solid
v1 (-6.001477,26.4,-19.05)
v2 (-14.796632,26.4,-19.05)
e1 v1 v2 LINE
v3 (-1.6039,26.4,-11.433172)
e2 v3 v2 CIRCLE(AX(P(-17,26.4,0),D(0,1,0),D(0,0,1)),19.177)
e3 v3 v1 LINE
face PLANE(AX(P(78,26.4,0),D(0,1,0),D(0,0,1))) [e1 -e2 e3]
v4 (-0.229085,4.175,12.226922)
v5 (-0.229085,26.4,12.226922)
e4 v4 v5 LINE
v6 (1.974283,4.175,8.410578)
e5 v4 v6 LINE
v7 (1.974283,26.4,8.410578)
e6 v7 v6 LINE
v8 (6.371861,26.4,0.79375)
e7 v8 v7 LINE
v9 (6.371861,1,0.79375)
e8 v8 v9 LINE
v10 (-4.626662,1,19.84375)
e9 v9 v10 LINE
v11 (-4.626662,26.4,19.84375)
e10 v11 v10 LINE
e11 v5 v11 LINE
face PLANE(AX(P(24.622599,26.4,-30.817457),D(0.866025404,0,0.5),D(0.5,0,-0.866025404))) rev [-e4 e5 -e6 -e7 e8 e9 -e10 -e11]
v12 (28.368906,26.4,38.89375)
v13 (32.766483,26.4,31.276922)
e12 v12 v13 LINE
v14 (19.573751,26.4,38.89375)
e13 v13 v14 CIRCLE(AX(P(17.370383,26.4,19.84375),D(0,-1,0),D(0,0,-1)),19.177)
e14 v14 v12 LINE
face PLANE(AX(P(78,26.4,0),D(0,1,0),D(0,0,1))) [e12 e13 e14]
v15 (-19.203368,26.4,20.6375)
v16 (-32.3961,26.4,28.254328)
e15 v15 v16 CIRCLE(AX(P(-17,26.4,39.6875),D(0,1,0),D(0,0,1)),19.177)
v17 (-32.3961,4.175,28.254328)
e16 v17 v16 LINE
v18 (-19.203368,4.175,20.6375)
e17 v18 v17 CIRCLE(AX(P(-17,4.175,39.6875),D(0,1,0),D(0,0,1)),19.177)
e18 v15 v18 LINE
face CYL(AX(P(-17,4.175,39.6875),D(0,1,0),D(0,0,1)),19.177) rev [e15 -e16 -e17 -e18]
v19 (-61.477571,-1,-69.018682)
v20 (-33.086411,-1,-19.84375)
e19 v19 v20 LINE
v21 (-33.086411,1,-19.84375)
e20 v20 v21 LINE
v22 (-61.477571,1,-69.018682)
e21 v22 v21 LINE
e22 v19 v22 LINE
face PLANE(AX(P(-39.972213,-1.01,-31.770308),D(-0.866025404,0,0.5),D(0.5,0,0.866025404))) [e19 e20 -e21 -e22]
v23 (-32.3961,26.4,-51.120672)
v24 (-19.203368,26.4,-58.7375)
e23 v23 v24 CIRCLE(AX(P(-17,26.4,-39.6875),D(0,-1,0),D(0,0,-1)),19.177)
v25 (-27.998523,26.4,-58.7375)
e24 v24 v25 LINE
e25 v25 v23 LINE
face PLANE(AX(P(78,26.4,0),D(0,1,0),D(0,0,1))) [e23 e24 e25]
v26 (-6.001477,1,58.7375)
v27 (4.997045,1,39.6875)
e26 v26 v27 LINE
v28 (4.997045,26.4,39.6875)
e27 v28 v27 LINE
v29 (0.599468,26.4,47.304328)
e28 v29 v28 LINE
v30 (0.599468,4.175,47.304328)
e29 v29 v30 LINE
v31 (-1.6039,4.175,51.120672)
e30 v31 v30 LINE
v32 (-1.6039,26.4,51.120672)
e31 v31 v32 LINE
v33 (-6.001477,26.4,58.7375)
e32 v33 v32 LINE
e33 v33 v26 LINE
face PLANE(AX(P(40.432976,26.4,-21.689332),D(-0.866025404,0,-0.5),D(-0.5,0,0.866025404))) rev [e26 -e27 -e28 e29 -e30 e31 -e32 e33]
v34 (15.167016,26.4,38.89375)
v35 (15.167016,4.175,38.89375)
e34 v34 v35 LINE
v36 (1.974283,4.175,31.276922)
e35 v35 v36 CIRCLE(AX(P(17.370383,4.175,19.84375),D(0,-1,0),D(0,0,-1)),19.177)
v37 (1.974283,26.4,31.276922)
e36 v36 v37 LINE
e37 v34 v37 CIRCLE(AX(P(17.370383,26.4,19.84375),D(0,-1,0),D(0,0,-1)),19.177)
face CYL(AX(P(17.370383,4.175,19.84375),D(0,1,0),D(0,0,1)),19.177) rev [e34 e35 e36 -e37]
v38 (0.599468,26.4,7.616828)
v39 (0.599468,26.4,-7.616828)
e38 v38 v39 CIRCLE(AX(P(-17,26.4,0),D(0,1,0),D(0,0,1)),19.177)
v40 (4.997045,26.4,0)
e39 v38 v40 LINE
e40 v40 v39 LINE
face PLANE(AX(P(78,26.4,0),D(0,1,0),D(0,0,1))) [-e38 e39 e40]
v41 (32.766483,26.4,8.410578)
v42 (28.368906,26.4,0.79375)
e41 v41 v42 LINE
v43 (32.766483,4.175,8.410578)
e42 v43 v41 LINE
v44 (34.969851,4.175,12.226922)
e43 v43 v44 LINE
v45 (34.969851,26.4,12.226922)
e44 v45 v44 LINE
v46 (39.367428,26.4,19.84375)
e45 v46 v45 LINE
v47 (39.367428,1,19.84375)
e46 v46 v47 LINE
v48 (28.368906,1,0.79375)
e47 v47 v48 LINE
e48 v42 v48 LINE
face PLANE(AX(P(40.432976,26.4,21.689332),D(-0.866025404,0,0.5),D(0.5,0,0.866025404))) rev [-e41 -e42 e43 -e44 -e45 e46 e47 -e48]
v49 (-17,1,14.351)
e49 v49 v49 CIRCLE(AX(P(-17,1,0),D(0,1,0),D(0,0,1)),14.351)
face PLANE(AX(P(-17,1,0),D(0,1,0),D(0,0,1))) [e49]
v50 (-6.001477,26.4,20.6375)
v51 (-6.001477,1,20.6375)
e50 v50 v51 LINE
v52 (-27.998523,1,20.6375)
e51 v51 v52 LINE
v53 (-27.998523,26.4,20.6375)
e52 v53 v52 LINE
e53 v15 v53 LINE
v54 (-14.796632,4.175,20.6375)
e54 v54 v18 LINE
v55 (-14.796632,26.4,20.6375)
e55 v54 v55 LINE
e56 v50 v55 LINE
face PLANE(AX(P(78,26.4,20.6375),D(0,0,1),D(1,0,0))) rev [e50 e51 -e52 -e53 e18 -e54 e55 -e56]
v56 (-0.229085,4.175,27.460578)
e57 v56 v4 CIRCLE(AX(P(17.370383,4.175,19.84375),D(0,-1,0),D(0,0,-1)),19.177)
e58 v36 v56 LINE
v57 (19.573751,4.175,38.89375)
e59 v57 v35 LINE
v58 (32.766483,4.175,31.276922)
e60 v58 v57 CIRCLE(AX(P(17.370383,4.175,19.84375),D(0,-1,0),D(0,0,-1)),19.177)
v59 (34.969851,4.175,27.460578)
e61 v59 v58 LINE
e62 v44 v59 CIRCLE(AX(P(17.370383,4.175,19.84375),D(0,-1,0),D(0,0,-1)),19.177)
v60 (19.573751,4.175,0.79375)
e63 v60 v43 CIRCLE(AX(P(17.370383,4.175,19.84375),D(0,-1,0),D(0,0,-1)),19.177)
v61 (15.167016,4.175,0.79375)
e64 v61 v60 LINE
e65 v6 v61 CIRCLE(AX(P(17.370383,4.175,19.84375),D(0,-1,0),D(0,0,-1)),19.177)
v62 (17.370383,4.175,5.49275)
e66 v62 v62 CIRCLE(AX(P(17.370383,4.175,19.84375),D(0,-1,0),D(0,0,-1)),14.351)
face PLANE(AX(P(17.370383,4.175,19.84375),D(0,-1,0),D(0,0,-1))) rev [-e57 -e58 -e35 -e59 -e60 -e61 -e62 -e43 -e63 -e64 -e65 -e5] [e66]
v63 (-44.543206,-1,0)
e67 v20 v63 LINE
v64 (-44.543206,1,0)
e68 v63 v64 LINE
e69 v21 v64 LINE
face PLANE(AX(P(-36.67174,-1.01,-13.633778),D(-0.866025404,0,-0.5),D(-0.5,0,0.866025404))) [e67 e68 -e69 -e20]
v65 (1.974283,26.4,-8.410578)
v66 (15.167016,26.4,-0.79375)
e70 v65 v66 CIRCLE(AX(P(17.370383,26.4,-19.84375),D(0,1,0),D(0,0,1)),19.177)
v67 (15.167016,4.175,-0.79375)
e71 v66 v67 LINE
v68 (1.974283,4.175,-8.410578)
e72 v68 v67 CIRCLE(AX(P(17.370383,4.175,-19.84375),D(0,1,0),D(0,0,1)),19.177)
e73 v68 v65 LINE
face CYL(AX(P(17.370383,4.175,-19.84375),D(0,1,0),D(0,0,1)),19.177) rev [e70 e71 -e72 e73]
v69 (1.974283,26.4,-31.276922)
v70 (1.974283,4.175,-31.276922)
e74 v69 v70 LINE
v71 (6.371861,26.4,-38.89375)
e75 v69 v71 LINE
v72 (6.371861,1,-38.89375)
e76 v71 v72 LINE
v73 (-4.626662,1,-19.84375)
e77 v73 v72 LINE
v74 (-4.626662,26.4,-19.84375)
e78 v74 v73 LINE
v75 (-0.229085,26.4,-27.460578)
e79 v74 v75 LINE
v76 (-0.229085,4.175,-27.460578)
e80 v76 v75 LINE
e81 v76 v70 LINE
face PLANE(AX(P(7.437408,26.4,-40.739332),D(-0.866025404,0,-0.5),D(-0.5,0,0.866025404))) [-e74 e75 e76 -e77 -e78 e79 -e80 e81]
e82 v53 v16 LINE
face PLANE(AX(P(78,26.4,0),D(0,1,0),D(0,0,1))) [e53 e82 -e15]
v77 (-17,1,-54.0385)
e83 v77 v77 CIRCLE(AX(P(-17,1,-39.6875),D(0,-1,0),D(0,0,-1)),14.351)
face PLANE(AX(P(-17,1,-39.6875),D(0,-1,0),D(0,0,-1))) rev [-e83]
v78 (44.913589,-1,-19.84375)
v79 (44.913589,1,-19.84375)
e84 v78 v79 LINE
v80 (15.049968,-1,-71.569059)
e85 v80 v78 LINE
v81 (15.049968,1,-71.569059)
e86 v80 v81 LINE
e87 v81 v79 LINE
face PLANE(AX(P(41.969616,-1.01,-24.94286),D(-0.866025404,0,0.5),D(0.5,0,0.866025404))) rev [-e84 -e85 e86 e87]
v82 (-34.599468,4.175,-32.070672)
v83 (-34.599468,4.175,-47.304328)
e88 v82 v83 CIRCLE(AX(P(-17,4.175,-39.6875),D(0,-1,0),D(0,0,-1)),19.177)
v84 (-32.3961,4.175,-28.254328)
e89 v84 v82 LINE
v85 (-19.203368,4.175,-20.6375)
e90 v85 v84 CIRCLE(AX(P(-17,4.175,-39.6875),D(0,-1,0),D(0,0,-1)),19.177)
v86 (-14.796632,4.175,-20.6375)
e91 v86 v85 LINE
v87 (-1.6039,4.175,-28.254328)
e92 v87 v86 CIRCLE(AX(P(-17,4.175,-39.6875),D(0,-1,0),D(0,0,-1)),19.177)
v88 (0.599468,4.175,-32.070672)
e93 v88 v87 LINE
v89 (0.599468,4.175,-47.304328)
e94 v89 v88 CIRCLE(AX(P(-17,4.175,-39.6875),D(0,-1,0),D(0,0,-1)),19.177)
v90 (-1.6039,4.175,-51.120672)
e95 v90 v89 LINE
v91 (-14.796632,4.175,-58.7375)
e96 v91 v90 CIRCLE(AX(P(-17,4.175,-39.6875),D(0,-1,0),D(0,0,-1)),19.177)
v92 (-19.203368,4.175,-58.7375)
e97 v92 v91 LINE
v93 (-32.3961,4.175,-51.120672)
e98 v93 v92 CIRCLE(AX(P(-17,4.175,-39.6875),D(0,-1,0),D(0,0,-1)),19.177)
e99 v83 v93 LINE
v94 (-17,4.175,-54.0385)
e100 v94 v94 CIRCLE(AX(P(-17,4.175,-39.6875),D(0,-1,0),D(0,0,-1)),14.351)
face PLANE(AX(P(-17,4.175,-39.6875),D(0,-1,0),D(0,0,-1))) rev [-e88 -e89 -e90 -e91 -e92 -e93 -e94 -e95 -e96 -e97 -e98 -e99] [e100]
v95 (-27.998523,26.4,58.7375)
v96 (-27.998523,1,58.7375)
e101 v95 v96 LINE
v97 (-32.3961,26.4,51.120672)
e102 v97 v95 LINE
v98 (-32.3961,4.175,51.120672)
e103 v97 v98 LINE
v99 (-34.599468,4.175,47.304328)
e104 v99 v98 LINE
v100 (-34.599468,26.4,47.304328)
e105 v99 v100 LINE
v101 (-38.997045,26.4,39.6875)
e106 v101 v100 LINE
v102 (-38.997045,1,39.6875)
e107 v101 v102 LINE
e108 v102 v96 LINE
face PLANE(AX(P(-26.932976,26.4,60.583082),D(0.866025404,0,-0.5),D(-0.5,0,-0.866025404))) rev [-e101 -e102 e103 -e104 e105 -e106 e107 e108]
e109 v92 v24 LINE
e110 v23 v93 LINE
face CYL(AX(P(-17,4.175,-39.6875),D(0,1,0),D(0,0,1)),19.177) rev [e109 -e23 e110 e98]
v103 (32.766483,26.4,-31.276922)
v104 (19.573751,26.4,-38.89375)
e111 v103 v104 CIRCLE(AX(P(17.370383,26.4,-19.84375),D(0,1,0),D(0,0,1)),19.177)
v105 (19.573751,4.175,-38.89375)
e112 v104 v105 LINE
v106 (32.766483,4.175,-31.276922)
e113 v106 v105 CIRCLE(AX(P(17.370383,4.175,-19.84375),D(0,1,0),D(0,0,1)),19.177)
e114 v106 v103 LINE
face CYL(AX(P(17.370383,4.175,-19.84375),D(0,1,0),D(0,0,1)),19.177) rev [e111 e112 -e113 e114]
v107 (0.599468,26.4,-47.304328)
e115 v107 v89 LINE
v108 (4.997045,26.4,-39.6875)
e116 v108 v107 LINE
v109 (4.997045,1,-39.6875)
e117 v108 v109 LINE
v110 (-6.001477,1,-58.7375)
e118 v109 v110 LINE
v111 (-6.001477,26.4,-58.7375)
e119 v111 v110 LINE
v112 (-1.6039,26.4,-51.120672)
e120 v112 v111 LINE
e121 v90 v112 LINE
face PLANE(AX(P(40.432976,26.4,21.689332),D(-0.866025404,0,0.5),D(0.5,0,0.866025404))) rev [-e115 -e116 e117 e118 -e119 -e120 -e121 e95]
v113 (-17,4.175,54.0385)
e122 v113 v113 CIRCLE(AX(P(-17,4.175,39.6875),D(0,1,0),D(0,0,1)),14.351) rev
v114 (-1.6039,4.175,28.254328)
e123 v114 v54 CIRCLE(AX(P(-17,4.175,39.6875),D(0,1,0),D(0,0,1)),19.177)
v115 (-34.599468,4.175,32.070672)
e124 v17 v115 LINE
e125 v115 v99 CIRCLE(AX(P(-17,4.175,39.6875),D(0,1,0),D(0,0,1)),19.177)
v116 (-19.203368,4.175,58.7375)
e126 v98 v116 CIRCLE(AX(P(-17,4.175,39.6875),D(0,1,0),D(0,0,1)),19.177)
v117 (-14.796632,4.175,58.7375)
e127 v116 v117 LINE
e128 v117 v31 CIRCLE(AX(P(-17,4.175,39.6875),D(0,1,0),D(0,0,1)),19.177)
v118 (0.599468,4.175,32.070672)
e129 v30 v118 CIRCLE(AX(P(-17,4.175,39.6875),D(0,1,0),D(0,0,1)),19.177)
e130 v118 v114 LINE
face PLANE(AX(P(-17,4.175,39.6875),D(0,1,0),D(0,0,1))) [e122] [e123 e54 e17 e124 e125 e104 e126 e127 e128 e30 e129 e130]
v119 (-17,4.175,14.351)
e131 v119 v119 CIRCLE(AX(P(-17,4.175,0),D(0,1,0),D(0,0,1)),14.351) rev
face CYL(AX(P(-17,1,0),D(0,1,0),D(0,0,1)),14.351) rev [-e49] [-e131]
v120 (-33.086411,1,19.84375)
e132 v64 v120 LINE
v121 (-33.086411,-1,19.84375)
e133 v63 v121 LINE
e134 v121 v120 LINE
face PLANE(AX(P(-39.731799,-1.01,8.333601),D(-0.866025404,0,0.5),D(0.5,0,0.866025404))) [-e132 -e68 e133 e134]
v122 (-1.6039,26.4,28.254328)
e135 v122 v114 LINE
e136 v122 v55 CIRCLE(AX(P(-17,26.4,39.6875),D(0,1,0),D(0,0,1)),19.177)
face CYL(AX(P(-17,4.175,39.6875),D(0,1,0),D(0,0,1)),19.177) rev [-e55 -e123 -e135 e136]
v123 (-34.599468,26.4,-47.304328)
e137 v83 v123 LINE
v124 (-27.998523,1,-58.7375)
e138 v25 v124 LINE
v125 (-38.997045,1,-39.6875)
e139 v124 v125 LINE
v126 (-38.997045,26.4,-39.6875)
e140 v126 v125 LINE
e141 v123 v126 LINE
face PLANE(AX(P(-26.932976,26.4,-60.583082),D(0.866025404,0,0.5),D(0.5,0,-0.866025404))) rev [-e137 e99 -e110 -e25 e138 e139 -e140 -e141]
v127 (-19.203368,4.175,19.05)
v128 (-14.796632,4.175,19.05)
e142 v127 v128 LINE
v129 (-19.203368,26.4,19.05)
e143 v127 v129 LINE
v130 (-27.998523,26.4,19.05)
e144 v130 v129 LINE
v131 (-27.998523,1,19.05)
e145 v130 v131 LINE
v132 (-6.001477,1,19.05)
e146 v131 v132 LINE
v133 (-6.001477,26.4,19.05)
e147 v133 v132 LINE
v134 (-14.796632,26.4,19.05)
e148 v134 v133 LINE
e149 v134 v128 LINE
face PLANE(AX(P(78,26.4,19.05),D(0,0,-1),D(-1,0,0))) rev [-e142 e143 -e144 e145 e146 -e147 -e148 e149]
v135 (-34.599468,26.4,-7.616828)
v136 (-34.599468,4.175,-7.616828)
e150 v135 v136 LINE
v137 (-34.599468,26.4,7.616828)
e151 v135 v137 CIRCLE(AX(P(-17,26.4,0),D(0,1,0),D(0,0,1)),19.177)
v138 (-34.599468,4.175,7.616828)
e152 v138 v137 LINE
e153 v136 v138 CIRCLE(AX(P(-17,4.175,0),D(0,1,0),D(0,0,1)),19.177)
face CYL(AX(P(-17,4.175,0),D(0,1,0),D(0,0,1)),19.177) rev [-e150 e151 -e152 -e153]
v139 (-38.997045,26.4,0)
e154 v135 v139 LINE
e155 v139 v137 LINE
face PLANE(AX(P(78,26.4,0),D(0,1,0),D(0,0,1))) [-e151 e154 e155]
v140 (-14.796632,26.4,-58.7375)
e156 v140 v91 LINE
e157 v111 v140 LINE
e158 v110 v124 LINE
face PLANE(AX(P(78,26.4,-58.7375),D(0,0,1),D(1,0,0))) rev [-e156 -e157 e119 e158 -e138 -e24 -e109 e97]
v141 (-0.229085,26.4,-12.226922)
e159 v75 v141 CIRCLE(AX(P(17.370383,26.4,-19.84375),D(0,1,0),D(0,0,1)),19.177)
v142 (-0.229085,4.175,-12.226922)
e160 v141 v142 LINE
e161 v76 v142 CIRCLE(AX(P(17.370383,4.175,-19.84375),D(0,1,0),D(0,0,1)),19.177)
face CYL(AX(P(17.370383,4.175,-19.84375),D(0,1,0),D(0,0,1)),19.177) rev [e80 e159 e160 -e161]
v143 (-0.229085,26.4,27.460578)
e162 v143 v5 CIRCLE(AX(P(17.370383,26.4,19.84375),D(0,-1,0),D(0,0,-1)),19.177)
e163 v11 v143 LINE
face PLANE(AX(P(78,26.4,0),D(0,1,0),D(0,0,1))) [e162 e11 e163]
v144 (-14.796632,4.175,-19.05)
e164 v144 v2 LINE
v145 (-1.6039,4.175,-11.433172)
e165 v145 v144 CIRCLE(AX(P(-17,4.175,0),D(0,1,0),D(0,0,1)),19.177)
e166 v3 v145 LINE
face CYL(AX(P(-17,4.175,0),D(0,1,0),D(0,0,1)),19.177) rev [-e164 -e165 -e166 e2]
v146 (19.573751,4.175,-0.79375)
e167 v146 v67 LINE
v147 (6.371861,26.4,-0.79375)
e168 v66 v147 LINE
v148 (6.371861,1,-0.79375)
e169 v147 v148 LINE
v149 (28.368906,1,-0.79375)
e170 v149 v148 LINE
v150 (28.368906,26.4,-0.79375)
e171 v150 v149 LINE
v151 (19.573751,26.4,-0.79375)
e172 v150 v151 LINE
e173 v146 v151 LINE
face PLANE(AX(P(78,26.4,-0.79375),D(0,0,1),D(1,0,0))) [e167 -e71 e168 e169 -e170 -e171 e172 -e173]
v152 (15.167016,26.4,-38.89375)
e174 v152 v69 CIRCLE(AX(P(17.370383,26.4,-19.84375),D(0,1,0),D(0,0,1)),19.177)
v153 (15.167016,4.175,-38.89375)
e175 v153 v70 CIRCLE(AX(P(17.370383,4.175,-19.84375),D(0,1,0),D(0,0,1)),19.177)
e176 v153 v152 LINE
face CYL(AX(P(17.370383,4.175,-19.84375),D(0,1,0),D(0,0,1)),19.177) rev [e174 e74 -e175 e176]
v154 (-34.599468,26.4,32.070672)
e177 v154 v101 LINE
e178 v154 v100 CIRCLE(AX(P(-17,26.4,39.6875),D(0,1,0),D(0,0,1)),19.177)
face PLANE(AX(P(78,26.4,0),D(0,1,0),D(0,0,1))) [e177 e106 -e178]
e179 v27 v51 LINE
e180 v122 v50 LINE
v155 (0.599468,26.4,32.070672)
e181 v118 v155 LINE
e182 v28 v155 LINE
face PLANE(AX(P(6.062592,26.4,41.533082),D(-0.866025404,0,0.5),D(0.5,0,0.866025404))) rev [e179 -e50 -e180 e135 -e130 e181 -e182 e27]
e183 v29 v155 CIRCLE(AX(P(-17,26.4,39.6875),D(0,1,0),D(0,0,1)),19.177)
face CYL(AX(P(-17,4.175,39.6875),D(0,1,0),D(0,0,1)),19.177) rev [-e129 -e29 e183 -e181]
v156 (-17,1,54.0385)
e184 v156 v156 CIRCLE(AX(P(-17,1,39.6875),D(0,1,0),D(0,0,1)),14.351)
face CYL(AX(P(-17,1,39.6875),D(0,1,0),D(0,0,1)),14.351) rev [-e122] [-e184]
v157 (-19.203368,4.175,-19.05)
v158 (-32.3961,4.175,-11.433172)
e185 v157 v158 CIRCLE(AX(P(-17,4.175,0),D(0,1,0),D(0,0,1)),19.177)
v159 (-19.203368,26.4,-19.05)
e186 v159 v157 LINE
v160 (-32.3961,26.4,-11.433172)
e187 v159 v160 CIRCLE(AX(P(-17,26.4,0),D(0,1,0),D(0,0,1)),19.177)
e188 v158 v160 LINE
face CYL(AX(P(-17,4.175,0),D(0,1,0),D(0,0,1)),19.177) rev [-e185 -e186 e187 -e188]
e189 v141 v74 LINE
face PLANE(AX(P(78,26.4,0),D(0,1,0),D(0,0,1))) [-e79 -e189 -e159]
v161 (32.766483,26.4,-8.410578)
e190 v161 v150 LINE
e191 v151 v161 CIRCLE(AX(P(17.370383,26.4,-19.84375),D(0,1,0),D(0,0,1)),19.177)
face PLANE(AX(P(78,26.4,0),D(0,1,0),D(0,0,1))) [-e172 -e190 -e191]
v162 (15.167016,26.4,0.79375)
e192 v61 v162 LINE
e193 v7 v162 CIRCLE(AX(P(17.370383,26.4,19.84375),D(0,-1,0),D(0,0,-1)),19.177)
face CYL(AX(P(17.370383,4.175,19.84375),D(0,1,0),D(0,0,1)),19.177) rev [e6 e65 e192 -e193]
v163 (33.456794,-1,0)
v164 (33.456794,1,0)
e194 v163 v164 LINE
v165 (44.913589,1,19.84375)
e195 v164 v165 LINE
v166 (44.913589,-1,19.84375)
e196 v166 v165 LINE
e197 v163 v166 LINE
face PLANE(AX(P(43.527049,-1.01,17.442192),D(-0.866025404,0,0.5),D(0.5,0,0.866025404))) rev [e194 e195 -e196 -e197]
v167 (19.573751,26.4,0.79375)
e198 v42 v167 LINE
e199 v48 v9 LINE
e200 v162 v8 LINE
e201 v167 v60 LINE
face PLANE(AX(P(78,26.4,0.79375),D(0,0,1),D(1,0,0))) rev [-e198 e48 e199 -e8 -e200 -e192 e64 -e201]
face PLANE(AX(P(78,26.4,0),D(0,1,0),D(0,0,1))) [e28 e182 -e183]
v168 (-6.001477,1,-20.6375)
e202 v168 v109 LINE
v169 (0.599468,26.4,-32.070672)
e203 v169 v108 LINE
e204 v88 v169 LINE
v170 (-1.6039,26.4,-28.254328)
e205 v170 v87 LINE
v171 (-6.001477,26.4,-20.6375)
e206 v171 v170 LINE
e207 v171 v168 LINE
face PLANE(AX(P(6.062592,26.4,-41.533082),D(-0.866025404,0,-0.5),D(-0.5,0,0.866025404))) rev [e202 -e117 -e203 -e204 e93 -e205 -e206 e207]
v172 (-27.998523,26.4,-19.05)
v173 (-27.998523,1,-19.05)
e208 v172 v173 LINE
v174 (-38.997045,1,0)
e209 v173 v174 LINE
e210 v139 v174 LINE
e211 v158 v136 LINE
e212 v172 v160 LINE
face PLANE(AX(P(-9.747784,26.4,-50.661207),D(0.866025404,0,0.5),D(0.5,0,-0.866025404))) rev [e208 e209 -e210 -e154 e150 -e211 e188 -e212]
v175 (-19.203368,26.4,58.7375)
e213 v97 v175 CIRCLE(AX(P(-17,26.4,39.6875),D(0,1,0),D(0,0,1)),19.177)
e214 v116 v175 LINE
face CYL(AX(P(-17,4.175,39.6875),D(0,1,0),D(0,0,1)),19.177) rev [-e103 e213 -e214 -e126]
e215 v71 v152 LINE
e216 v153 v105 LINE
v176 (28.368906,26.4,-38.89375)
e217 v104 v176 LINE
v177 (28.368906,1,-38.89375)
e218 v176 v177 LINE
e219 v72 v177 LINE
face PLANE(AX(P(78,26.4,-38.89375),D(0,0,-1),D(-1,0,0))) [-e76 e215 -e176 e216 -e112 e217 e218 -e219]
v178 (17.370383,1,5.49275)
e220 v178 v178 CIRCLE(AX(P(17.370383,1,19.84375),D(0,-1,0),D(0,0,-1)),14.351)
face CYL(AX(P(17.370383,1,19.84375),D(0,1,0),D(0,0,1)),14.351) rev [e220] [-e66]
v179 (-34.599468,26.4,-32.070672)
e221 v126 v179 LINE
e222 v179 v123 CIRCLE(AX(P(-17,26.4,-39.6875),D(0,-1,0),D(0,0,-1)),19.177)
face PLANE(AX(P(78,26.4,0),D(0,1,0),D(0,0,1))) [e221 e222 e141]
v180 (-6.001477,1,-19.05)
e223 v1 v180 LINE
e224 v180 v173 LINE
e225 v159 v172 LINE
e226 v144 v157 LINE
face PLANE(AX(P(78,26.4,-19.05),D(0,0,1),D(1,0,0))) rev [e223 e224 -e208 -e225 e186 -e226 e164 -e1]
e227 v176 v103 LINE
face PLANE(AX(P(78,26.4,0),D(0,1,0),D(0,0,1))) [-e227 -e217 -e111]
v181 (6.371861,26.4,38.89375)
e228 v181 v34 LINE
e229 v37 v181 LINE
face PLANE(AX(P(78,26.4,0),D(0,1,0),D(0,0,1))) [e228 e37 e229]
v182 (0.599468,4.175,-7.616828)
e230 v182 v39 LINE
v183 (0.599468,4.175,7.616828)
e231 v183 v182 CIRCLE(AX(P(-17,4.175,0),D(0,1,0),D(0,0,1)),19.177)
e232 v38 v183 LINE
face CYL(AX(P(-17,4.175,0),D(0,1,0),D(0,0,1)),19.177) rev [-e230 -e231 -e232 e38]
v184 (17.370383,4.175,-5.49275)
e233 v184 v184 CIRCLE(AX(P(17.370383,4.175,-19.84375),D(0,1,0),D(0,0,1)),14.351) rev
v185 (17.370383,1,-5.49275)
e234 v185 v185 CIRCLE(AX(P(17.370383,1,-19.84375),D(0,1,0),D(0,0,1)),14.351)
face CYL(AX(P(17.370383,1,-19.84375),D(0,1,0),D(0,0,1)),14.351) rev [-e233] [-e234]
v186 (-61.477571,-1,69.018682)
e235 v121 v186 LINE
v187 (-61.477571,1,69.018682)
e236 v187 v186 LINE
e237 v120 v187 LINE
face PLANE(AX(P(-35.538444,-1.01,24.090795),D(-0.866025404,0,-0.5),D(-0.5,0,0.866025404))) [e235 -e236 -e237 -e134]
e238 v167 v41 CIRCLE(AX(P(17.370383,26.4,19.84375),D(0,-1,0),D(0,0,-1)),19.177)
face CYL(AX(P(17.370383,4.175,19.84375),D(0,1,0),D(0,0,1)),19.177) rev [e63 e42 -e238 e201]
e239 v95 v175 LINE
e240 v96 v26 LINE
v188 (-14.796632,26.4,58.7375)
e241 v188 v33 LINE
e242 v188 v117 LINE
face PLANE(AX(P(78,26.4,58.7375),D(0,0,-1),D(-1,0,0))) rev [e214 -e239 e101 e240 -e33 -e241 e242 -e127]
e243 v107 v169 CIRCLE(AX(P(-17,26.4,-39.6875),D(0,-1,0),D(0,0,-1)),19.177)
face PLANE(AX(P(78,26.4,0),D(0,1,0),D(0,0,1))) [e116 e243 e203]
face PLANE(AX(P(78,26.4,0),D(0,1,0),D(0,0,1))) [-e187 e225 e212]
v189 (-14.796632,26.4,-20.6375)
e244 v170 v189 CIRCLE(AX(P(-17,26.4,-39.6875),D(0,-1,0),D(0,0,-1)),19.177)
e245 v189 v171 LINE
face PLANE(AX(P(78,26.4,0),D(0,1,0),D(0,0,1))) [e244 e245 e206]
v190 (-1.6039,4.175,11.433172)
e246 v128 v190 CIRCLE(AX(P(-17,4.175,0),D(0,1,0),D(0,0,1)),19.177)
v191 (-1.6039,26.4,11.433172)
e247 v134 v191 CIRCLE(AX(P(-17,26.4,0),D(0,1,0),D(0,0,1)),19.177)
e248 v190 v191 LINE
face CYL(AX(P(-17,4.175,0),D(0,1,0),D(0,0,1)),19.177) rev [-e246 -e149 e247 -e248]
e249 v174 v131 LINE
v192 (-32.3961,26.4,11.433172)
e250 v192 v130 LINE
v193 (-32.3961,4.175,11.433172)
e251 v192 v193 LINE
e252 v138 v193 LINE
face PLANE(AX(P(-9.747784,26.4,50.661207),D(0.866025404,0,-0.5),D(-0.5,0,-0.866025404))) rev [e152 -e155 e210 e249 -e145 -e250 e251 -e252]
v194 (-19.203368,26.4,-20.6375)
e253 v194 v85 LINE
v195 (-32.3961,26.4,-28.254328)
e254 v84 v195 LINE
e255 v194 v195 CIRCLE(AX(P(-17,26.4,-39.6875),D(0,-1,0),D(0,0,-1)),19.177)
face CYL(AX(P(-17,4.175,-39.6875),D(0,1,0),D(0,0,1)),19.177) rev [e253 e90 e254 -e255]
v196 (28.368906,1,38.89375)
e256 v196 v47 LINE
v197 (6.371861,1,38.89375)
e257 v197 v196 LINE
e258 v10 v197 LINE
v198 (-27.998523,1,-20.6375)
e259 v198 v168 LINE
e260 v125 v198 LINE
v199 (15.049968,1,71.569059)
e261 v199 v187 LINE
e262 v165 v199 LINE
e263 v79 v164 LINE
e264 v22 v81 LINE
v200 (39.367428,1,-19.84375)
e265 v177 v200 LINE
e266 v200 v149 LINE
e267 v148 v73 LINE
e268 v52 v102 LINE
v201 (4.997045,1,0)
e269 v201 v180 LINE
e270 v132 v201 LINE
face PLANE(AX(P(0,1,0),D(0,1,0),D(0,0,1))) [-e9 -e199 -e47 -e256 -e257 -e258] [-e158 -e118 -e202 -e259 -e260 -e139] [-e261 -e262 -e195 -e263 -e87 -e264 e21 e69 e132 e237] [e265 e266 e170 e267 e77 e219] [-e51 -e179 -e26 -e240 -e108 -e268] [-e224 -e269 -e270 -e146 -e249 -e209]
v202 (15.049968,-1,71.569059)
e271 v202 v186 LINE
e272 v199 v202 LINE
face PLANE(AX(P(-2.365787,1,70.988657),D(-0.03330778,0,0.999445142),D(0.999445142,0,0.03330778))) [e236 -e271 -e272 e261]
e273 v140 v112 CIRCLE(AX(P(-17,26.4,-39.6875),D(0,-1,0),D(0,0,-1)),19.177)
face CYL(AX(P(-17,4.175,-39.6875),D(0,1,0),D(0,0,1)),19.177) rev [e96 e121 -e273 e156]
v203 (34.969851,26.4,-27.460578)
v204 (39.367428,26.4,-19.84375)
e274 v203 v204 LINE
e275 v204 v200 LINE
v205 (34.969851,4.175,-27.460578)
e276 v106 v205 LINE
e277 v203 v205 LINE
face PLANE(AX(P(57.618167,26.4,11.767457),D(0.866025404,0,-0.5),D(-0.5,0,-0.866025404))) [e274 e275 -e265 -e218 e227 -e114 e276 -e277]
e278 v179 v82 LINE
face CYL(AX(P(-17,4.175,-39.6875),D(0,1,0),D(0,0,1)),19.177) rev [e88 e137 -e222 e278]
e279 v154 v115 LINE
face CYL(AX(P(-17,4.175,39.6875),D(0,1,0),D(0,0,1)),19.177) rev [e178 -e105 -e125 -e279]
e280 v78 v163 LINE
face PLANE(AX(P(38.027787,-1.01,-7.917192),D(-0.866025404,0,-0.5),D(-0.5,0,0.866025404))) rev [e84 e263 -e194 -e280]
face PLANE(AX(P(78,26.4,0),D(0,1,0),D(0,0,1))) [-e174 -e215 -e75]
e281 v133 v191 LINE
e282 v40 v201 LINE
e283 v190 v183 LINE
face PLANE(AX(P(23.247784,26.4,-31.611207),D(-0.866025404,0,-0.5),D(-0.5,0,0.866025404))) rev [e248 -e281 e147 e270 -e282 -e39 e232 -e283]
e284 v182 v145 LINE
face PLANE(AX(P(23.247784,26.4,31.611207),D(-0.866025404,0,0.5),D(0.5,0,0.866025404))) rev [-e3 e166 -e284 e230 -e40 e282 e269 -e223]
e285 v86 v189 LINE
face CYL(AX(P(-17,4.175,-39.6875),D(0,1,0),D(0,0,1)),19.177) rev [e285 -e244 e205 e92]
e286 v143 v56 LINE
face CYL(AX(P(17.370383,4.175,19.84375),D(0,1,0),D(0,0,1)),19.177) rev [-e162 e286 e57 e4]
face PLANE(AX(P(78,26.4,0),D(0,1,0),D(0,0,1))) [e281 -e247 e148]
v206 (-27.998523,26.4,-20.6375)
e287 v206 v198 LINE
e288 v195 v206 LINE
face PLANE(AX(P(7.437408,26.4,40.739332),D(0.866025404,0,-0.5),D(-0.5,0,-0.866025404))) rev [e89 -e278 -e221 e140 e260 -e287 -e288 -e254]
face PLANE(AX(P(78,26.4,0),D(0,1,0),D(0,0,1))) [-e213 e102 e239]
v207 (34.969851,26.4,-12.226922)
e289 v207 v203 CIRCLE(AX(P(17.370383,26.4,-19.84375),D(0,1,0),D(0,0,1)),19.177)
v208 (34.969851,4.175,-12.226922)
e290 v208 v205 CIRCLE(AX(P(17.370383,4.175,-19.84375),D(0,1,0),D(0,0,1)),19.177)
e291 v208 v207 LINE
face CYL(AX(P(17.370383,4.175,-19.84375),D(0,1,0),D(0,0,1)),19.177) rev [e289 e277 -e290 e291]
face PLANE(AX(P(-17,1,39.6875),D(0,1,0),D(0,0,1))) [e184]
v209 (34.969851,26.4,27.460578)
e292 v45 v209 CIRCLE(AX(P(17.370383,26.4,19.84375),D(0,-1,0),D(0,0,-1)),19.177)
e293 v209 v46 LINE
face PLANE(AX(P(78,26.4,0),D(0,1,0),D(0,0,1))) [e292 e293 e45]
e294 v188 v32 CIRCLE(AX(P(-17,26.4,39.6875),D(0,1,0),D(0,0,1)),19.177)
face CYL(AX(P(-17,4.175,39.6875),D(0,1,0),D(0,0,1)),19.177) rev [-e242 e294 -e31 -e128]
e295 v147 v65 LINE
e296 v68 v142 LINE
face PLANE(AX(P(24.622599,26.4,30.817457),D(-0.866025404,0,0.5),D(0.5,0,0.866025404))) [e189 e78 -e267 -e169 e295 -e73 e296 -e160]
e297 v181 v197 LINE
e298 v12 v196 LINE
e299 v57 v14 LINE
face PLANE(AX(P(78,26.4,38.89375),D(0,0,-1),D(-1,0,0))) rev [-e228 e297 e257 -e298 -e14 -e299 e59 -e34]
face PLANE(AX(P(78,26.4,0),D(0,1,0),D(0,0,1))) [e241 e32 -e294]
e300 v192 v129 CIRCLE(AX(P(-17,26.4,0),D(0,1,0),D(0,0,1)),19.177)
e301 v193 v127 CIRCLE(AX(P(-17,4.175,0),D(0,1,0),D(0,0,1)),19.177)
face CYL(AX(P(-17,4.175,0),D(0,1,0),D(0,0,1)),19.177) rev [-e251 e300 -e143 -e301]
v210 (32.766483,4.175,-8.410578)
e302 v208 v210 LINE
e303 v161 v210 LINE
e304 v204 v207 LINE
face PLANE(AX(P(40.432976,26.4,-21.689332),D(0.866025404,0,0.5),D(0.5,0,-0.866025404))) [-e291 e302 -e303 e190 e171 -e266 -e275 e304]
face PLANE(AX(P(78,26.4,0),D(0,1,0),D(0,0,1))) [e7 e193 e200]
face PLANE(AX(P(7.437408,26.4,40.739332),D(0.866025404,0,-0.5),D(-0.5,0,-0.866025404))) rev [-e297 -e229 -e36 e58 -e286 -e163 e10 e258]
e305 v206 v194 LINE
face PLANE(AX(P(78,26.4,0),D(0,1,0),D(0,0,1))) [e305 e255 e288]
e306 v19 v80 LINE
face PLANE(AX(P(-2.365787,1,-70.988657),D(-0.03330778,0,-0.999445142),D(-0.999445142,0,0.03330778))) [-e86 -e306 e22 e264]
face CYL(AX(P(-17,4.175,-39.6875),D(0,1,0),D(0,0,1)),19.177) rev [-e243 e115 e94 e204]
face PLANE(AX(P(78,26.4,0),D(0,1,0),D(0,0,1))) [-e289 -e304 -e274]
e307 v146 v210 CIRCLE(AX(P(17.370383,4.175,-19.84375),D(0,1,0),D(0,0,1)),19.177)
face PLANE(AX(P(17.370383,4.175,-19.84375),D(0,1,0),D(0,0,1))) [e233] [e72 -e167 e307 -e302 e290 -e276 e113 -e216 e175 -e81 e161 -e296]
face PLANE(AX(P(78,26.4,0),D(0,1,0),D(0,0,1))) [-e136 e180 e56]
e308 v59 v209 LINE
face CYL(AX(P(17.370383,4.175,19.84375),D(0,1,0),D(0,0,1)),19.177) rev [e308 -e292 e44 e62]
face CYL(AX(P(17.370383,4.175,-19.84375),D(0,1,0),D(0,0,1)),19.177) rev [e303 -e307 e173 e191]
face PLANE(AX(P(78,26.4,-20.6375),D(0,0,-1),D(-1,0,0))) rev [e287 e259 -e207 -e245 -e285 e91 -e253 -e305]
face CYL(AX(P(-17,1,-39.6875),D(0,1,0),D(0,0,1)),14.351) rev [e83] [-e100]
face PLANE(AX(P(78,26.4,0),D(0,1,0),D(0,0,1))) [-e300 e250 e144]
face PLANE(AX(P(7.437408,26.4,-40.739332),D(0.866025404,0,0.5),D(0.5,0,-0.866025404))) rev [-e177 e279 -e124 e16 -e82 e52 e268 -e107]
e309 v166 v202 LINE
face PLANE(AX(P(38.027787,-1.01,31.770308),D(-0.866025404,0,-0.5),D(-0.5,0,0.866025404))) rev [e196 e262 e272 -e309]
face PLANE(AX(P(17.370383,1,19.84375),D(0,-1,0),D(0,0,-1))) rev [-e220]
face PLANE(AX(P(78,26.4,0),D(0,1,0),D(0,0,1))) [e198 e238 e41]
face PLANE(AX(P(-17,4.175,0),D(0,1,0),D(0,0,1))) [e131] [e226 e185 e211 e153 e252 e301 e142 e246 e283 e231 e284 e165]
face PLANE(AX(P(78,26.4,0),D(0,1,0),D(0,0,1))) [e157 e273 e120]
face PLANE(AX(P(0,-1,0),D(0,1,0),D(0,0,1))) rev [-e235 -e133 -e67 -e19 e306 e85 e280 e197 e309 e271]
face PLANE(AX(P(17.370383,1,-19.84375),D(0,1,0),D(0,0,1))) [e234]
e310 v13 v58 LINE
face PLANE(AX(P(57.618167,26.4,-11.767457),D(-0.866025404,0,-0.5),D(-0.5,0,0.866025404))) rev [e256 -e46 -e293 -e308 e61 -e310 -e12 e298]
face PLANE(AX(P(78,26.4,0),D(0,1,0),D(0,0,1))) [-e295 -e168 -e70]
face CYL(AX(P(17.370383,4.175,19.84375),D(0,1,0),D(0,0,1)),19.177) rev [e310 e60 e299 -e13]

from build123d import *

# Parameters (mm, degrees)
BOSS_EXTRUDE1_DEPTH = 1
BOSS_EXTRUDE2_DEPTH = 25.4
SKETCH4_R           = 14.351
CUT_EXTRUDE1_DEPTH  = 25.4
SKETCH4_4_R         = 19.177
CUT_EXTRUDE2_DEPTH  = 22.225
LPATTERN1_COUNT     = 3
LPATTERN1_PITCH     = 78
SPLIT3_START        = -1
SPLIT3_DEPTH        = 27.4


# Read off the part's stored shape, not the designer's step: Split3
with BuildPart() as part:
    # Sketch1 → Boss-Extrude1 (new, symmetric)
    with BuildSketch(Plane(origin=(0, 0, 0), x_dir=(1, 0, 0), z_dir=(0, 1, 0))):
        Polygon((118, 0), (-118, 0), (-118, -67.135), (118, -75), align=None)
        Polygon((-118, 67.135), (-118, 0), (118, 0), (118, 75), align=None)
    extrude(amount=BOSS_EXTRUDE1_DEPTH, both=True)

    # Sketch3 → Boss-Extrude2 (add)
    with BuildSketch(Plane(origin=(0, 1, 0), x_dir=(1, 0, 0), z_dir=(0, 1, 0))):
        Polygon((-84.001477372, 20.6375), (-73.002954744, 39.6875), (-84.001477372, 58.7375), (-105.998522628, 58.7375), (-116.997045256, 39.6875), (-105.998522628, 20.6375), align=None)
        Polygon((-38.632571531, 19.84375), (-49.631094159, 0.79375), (-71.628139415, 0.79375), (-82.626662043, 19.84375), (-71.628139415, 38.89375), (-49.631094159, 38.89375), align=None)
        Polygon((-84.001477372, -19.05), (-73.002954744, 0), (-84.001477372, 19.05), (-105.998522628, 19.05), (-116.997045256, 0), (-105.998522628, -19.05), align=None)
        Polygon((-105.998522628, -58.7375), (-84.001477372, -58.7375), (-73.002954744, -39.6875), (-84.001477372, -20.6375), (-105.998522628, -20.6375), (-116.997045256, -39.6875), align=None)
        Polygon((-71.628139415, -38.89375), (-49.631094159, -38.89375), (-38.632571531, -19.84375), (-49.631094159, -0.79375), (-71.628139415, -0.79375), (-82.626662043, -19.84375), align=None)
    boss_extrude2 = extrude(amount=BOSS_EXTRUDE2_DEPTH)

    # Sketch4 → Cut-Extrude1 (cut)
    with BuildSketch(Plane(origin=(0, 26.4, 0), x_dir=(1, 0, 0), z_dir=(0, 1, 0))):
        with Locations(Location((-95, 0, 0), (0, 0, 270))):
            Circle(SKETCH4_R)
        with Locations(Location((-95, -39.6875, 0), (0, 0, 270))):
            Circle(SKETCH4_R)
        with Locations(Location((-95, 39.6875, 0), (0, 0, 90))):
            Circle(SKETCH4_R)
        with Locations(Location((-60.629616787, 19.84375, 0), (0, 0, 270))):
            Circle(SKETCH4_R)
        with Locations(Location((-60.629616787, -19.84375, 0), (0, 0, 90))):
            Circle(SKETCH4_R)
    cut_extrude1 = extrude(amount=-CUT_EXTRUDE1_DEPTH, mode=Mode.SUBTRACT)

    # Sketch4<4> → Cut-Extrude2 (cut)
    with BuildSketch(Plane(origin=(0, 26.4, 0), x_dir=(1, 0, 0), z_dir=(0, 1, 0))):
        with Locations((-95, 0)):
            Circle(SKETCH4_4_R)
        with Locations((-95, -39.6875)):
            Circle(SKETCH4_4_R)
        with Locations((-95, 39.6875)):
            Circle(SKETCH4_4_R)
        with Locations((-60.629616787, 19.84375)):
            Circle(SKETCH4_4_R)
        with Locations((-60.629616787, -19.84375)):
            Circle(SKETCH4_4_R)
    cut_extrude2 = extrude(amount=-CUT_EXTRUDE2_DEPTH, mode=Mode.SUBTRACT)

    # LPattern1: Boss-Extrude2, Cut-Extrude1, Cut-Extrude2 ×3
    with Locations(*[(i * LPATTERN1_PITCH, 0, 0) for i in range(1, LPATTERN1_COUNT)]):
        add(boss_extrude2)
        add(cut_extrude1, mode=Mode.SUBTRACT)
        add(cut_extrude2, mode=Mode.SUBTRACT)

    # Split3 outline → Split3 (cut)
    with BuildSketch(Plane(origin=(0, 0, 0), x_dir=(1, 0, 0), z_dir=(0, 1, 0)).offset(SPLIT3_START)):
        Polygon((33.456794404, 0), (44.913588808, -19.84375), (15.04996756, -71.5690593), (118, -75), (118, 75), (15.04996756, 71.5690593), (44.913588808, 19.84375), align=None)
        Polygon((-118, -67.135), (-61.477571296, -69.018681787), (-33.086411192, -19.84375), (-44.543205596, 0), (-33.086411192, 19.84375), (-61.477571296, 69.018681787), (-118, 67.135), align=None)
    extrude(amount=SPLIT3_DEPTH, mode=Mode.SUBTRACT)


solid = part.part
